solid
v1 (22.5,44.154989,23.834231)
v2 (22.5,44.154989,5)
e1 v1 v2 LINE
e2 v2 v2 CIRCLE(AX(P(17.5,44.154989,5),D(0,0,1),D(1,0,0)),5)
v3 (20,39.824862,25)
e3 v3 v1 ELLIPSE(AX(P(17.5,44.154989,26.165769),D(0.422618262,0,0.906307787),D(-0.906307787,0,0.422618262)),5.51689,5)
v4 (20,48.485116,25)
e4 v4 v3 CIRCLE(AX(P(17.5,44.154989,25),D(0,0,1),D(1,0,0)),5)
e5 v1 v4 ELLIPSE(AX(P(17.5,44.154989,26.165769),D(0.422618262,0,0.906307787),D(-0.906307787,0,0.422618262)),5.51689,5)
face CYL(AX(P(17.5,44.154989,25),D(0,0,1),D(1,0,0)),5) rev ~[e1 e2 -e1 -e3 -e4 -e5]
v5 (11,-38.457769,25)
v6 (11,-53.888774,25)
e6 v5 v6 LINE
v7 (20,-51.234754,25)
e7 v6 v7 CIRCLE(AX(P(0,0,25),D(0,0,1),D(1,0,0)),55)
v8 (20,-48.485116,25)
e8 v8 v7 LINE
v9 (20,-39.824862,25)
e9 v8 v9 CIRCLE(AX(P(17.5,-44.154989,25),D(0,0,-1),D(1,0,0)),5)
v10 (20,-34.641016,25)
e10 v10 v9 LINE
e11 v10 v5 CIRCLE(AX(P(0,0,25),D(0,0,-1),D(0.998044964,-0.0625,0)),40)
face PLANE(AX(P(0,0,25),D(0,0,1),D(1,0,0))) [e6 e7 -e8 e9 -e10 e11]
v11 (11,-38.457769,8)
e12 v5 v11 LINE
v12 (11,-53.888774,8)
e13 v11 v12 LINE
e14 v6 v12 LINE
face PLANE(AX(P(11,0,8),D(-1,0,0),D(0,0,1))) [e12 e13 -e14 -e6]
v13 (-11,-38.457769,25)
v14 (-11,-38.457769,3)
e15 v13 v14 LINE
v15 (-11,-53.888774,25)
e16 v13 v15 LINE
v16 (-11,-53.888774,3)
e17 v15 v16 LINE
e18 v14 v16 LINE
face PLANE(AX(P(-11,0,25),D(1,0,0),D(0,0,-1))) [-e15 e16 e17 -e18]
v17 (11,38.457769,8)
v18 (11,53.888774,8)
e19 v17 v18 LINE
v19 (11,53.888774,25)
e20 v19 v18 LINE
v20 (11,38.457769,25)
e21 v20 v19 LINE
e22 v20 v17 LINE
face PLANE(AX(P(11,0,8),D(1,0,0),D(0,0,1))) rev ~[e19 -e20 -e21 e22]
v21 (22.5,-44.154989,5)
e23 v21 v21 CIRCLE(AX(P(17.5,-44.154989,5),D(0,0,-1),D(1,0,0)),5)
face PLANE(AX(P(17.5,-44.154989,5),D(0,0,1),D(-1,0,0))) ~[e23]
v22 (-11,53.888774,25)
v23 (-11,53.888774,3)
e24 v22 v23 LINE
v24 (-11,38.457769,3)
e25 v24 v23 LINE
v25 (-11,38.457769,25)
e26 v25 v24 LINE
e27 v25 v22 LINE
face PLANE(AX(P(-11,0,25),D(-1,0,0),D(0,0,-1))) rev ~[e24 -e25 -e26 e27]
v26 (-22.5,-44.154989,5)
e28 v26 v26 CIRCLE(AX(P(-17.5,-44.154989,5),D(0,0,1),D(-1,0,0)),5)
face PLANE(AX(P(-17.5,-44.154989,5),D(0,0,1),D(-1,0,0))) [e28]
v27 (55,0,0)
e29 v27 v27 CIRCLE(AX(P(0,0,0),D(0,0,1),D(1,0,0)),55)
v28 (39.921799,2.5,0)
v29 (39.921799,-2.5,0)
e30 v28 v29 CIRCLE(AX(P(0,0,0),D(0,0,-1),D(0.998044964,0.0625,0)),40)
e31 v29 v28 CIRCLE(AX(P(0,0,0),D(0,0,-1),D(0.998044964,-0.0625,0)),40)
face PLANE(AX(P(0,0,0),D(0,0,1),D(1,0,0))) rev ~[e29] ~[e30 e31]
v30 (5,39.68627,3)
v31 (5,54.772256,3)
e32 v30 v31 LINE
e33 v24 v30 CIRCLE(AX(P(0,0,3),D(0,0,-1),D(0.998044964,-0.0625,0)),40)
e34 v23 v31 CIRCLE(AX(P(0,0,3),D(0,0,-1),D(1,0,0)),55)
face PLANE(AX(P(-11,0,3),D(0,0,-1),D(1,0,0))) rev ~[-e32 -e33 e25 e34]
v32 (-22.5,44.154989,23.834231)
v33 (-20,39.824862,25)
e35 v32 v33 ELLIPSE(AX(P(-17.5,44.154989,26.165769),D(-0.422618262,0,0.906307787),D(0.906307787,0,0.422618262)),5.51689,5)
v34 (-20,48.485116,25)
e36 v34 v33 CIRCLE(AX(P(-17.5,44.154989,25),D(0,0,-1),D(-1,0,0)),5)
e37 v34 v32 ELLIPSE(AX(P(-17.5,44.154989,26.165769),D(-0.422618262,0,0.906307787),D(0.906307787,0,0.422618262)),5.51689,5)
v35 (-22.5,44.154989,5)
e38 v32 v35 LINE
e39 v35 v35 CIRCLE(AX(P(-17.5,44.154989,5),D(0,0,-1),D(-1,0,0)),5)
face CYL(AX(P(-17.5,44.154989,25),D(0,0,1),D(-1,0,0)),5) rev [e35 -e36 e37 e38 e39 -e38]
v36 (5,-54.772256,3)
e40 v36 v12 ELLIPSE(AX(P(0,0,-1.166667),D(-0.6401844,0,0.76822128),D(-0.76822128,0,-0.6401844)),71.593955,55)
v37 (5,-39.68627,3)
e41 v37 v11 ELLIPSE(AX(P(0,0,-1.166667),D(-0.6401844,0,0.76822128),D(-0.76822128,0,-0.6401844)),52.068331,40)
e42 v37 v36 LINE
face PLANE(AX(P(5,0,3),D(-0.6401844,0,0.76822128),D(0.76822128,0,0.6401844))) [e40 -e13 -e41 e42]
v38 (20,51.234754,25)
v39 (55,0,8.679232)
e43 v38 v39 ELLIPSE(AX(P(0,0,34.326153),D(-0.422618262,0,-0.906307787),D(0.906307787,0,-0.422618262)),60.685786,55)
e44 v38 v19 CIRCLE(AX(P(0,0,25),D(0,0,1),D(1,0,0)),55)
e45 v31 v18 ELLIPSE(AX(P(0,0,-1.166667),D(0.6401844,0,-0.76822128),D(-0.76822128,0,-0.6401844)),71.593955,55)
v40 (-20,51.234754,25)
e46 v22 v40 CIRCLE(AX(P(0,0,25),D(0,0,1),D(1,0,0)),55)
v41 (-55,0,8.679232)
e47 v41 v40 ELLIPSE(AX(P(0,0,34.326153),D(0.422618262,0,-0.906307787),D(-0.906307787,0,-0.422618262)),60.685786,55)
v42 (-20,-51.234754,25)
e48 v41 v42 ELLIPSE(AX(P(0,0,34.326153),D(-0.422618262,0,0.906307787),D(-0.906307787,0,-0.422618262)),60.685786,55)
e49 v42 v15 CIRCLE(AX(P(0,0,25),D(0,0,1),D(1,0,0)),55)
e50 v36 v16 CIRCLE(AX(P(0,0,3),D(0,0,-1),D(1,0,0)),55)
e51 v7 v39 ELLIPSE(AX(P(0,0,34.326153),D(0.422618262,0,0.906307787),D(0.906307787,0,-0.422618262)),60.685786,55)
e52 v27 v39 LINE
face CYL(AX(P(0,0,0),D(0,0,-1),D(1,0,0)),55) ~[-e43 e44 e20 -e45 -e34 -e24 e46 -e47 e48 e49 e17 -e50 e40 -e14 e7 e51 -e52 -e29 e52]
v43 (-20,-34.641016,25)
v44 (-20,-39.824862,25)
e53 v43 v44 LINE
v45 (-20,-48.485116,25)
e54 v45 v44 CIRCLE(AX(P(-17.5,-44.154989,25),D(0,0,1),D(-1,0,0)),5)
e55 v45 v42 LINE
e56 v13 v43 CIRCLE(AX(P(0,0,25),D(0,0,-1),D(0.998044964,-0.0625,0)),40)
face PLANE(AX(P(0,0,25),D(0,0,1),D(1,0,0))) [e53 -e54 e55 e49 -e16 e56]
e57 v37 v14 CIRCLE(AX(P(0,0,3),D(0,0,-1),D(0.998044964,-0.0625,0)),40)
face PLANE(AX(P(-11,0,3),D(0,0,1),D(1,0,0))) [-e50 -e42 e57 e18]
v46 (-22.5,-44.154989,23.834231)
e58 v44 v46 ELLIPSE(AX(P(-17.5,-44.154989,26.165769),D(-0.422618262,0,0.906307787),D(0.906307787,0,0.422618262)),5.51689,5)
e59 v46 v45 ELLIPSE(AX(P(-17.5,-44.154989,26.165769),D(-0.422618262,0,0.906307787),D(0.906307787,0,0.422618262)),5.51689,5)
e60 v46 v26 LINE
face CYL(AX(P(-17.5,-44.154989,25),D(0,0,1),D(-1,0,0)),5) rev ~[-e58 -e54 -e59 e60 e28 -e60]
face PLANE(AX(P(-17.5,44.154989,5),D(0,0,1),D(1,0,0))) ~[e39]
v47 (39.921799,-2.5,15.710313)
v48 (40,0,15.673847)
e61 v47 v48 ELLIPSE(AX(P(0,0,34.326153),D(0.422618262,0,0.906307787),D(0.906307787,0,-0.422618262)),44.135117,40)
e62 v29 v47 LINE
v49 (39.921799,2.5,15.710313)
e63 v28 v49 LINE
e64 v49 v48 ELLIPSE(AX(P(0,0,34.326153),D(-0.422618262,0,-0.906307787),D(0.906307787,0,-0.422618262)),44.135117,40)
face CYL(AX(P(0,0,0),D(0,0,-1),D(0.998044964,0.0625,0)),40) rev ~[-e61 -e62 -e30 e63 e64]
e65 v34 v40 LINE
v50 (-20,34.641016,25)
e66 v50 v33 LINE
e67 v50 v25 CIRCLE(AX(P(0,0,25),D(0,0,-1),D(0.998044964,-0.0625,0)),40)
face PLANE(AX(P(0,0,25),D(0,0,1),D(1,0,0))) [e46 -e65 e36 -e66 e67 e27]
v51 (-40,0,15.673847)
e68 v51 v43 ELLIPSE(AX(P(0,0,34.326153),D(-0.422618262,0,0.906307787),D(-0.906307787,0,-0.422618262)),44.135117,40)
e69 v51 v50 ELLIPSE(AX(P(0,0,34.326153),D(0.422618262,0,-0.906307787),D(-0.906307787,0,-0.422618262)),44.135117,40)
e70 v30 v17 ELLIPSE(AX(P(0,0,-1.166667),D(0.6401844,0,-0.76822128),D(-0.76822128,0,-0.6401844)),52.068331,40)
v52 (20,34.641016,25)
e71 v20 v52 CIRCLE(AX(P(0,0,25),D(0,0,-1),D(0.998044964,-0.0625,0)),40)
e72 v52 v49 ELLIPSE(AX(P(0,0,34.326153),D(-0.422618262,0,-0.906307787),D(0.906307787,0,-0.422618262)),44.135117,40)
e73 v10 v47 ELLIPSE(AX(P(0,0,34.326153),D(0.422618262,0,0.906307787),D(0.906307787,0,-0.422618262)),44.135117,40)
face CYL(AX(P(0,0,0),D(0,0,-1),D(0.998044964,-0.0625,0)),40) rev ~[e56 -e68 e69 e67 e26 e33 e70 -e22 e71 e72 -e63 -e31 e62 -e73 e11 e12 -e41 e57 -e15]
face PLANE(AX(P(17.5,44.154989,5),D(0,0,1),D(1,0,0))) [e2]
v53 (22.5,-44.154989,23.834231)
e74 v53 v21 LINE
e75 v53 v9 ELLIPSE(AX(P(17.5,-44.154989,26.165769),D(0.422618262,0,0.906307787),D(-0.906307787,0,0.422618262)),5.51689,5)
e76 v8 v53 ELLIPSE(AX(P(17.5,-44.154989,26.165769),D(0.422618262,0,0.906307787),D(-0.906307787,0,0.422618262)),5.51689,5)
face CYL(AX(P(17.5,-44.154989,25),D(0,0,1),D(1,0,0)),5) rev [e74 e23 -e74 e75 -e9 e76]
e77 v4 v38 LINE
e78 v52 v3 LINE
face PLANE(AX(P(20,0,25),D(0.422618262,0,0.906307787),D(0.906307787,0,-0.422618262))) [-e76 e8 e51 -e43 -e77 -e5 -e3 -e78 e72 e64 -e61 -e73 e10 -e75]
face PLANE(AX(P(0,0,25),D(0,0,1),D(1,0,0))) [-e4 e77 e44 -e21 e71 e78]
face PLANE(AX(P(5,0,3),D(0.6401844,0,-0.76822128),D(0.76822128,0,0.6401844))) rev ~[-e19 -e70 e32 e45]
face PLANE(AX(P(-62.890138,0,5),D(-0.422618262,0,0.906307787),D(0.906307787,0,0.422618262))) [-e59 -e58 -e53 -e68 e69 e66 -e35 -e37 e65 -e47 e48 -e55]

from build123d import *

# Parameters (mm, degrees)
F0_R             = 55
F1_DEPTH         = 25
F3_DEPTH         = 55.001
F3_DEPTH_BACK    = 55.001
F5_DEPTH         = 55.001
F5_DEPTH_BACK    = 55.001
F6_R             = 5
F8_DEPTH         = 20
F8_COPIES2_COUNT = 2


# Not quite as in the source:
# - a pattern or mirror of a feature is missing from the dataset's text; its kind, count and spacing are read off the source's solid


with BuildPart() as f1:
    # F0 (on Top) → F1 (new body)
    with BuildSketch(Plane.XY):
        Circle(F0_R)
        with BuildLine():
            ThreePointArc((39.9217985567, -2.5), (-40, 0), (39.9217985567, 2.5))
            ThreePointArc((39.9217985567, 2.5), (40, 0), (39.9217985567, -2.5))
        make_face(mode=Mode.SUBTRACT)
    extrude(amount=F1_DEPTH)

    # F2 (on Front) → F3 (cut, two sides)
    with BuildSketch(Plane.XZ) as f3_sk:
        Polygon((62.8901384102, 25), (20, 25), (62.8901384102, 5), align=None)
        Polygon((-62.8901384102, 5), (-20, 25), (-62.8901384102, 25), align=None)
    extrude(amount=-F3_DEPTH, mode=Mode.SUBTRACT)
    extrude(f3_sk.sketch, amount=F3_DEPTH_BACK, mode=Mode.SUBTRACT)

    # F4 (on Front) → F5 (cut, two sides)
    with BuildSketch(Plane.XZ) as f5_sk:
        Polygon((11, 25), (-11, 25), (-11, 3), (5, 3), (11, 8), align=None)
    extrude(amount=F5_DEPTH, mode=Mode.SUBTRACT)
    extrude(f5_sk.sketch, amount=-F5_DEPTH_BACK, mode=Mode.SUBTRACT)

    # F6 (on face) → F8 (cut, through all)
    with BuildSketch(Plane.XY.offset(25)):
        with Locations((17.5, 44.1549887905)):
            Circle(F6_R)
    f8 = extrude(amount=-F8_DEPTH, mode=Mode.SUBTRACT)

    # F8_copies: F8 across plane
    add(f8.mirror(Plane(origin=(0, 0, 0), x_dir=(0, 0, -1), z_dir=(-1, 0, 0))), mode=Mode.SUBTRACT)

    # F8_copies1: F8 across plane
    add(f8.mirror(Plane(origin=(0, 0, 0), x_dir=(0, 0, -1), z_dir=(0, -1, 0))), mode=Mode.SUBTRACT)

    # F8_copies2: F8 ×2 about axis
    f8_copies2_axis = Axis((0, 0, 0), (0, 0, 1))
    for i in range(1, F8_COPIES2_COUNT):
        add(f8.rotate(f8_copies2_axis, i * 360 / F8_COPIES2_COUNT), mode=Mode.SUBTRACT)


solid = f1.part
